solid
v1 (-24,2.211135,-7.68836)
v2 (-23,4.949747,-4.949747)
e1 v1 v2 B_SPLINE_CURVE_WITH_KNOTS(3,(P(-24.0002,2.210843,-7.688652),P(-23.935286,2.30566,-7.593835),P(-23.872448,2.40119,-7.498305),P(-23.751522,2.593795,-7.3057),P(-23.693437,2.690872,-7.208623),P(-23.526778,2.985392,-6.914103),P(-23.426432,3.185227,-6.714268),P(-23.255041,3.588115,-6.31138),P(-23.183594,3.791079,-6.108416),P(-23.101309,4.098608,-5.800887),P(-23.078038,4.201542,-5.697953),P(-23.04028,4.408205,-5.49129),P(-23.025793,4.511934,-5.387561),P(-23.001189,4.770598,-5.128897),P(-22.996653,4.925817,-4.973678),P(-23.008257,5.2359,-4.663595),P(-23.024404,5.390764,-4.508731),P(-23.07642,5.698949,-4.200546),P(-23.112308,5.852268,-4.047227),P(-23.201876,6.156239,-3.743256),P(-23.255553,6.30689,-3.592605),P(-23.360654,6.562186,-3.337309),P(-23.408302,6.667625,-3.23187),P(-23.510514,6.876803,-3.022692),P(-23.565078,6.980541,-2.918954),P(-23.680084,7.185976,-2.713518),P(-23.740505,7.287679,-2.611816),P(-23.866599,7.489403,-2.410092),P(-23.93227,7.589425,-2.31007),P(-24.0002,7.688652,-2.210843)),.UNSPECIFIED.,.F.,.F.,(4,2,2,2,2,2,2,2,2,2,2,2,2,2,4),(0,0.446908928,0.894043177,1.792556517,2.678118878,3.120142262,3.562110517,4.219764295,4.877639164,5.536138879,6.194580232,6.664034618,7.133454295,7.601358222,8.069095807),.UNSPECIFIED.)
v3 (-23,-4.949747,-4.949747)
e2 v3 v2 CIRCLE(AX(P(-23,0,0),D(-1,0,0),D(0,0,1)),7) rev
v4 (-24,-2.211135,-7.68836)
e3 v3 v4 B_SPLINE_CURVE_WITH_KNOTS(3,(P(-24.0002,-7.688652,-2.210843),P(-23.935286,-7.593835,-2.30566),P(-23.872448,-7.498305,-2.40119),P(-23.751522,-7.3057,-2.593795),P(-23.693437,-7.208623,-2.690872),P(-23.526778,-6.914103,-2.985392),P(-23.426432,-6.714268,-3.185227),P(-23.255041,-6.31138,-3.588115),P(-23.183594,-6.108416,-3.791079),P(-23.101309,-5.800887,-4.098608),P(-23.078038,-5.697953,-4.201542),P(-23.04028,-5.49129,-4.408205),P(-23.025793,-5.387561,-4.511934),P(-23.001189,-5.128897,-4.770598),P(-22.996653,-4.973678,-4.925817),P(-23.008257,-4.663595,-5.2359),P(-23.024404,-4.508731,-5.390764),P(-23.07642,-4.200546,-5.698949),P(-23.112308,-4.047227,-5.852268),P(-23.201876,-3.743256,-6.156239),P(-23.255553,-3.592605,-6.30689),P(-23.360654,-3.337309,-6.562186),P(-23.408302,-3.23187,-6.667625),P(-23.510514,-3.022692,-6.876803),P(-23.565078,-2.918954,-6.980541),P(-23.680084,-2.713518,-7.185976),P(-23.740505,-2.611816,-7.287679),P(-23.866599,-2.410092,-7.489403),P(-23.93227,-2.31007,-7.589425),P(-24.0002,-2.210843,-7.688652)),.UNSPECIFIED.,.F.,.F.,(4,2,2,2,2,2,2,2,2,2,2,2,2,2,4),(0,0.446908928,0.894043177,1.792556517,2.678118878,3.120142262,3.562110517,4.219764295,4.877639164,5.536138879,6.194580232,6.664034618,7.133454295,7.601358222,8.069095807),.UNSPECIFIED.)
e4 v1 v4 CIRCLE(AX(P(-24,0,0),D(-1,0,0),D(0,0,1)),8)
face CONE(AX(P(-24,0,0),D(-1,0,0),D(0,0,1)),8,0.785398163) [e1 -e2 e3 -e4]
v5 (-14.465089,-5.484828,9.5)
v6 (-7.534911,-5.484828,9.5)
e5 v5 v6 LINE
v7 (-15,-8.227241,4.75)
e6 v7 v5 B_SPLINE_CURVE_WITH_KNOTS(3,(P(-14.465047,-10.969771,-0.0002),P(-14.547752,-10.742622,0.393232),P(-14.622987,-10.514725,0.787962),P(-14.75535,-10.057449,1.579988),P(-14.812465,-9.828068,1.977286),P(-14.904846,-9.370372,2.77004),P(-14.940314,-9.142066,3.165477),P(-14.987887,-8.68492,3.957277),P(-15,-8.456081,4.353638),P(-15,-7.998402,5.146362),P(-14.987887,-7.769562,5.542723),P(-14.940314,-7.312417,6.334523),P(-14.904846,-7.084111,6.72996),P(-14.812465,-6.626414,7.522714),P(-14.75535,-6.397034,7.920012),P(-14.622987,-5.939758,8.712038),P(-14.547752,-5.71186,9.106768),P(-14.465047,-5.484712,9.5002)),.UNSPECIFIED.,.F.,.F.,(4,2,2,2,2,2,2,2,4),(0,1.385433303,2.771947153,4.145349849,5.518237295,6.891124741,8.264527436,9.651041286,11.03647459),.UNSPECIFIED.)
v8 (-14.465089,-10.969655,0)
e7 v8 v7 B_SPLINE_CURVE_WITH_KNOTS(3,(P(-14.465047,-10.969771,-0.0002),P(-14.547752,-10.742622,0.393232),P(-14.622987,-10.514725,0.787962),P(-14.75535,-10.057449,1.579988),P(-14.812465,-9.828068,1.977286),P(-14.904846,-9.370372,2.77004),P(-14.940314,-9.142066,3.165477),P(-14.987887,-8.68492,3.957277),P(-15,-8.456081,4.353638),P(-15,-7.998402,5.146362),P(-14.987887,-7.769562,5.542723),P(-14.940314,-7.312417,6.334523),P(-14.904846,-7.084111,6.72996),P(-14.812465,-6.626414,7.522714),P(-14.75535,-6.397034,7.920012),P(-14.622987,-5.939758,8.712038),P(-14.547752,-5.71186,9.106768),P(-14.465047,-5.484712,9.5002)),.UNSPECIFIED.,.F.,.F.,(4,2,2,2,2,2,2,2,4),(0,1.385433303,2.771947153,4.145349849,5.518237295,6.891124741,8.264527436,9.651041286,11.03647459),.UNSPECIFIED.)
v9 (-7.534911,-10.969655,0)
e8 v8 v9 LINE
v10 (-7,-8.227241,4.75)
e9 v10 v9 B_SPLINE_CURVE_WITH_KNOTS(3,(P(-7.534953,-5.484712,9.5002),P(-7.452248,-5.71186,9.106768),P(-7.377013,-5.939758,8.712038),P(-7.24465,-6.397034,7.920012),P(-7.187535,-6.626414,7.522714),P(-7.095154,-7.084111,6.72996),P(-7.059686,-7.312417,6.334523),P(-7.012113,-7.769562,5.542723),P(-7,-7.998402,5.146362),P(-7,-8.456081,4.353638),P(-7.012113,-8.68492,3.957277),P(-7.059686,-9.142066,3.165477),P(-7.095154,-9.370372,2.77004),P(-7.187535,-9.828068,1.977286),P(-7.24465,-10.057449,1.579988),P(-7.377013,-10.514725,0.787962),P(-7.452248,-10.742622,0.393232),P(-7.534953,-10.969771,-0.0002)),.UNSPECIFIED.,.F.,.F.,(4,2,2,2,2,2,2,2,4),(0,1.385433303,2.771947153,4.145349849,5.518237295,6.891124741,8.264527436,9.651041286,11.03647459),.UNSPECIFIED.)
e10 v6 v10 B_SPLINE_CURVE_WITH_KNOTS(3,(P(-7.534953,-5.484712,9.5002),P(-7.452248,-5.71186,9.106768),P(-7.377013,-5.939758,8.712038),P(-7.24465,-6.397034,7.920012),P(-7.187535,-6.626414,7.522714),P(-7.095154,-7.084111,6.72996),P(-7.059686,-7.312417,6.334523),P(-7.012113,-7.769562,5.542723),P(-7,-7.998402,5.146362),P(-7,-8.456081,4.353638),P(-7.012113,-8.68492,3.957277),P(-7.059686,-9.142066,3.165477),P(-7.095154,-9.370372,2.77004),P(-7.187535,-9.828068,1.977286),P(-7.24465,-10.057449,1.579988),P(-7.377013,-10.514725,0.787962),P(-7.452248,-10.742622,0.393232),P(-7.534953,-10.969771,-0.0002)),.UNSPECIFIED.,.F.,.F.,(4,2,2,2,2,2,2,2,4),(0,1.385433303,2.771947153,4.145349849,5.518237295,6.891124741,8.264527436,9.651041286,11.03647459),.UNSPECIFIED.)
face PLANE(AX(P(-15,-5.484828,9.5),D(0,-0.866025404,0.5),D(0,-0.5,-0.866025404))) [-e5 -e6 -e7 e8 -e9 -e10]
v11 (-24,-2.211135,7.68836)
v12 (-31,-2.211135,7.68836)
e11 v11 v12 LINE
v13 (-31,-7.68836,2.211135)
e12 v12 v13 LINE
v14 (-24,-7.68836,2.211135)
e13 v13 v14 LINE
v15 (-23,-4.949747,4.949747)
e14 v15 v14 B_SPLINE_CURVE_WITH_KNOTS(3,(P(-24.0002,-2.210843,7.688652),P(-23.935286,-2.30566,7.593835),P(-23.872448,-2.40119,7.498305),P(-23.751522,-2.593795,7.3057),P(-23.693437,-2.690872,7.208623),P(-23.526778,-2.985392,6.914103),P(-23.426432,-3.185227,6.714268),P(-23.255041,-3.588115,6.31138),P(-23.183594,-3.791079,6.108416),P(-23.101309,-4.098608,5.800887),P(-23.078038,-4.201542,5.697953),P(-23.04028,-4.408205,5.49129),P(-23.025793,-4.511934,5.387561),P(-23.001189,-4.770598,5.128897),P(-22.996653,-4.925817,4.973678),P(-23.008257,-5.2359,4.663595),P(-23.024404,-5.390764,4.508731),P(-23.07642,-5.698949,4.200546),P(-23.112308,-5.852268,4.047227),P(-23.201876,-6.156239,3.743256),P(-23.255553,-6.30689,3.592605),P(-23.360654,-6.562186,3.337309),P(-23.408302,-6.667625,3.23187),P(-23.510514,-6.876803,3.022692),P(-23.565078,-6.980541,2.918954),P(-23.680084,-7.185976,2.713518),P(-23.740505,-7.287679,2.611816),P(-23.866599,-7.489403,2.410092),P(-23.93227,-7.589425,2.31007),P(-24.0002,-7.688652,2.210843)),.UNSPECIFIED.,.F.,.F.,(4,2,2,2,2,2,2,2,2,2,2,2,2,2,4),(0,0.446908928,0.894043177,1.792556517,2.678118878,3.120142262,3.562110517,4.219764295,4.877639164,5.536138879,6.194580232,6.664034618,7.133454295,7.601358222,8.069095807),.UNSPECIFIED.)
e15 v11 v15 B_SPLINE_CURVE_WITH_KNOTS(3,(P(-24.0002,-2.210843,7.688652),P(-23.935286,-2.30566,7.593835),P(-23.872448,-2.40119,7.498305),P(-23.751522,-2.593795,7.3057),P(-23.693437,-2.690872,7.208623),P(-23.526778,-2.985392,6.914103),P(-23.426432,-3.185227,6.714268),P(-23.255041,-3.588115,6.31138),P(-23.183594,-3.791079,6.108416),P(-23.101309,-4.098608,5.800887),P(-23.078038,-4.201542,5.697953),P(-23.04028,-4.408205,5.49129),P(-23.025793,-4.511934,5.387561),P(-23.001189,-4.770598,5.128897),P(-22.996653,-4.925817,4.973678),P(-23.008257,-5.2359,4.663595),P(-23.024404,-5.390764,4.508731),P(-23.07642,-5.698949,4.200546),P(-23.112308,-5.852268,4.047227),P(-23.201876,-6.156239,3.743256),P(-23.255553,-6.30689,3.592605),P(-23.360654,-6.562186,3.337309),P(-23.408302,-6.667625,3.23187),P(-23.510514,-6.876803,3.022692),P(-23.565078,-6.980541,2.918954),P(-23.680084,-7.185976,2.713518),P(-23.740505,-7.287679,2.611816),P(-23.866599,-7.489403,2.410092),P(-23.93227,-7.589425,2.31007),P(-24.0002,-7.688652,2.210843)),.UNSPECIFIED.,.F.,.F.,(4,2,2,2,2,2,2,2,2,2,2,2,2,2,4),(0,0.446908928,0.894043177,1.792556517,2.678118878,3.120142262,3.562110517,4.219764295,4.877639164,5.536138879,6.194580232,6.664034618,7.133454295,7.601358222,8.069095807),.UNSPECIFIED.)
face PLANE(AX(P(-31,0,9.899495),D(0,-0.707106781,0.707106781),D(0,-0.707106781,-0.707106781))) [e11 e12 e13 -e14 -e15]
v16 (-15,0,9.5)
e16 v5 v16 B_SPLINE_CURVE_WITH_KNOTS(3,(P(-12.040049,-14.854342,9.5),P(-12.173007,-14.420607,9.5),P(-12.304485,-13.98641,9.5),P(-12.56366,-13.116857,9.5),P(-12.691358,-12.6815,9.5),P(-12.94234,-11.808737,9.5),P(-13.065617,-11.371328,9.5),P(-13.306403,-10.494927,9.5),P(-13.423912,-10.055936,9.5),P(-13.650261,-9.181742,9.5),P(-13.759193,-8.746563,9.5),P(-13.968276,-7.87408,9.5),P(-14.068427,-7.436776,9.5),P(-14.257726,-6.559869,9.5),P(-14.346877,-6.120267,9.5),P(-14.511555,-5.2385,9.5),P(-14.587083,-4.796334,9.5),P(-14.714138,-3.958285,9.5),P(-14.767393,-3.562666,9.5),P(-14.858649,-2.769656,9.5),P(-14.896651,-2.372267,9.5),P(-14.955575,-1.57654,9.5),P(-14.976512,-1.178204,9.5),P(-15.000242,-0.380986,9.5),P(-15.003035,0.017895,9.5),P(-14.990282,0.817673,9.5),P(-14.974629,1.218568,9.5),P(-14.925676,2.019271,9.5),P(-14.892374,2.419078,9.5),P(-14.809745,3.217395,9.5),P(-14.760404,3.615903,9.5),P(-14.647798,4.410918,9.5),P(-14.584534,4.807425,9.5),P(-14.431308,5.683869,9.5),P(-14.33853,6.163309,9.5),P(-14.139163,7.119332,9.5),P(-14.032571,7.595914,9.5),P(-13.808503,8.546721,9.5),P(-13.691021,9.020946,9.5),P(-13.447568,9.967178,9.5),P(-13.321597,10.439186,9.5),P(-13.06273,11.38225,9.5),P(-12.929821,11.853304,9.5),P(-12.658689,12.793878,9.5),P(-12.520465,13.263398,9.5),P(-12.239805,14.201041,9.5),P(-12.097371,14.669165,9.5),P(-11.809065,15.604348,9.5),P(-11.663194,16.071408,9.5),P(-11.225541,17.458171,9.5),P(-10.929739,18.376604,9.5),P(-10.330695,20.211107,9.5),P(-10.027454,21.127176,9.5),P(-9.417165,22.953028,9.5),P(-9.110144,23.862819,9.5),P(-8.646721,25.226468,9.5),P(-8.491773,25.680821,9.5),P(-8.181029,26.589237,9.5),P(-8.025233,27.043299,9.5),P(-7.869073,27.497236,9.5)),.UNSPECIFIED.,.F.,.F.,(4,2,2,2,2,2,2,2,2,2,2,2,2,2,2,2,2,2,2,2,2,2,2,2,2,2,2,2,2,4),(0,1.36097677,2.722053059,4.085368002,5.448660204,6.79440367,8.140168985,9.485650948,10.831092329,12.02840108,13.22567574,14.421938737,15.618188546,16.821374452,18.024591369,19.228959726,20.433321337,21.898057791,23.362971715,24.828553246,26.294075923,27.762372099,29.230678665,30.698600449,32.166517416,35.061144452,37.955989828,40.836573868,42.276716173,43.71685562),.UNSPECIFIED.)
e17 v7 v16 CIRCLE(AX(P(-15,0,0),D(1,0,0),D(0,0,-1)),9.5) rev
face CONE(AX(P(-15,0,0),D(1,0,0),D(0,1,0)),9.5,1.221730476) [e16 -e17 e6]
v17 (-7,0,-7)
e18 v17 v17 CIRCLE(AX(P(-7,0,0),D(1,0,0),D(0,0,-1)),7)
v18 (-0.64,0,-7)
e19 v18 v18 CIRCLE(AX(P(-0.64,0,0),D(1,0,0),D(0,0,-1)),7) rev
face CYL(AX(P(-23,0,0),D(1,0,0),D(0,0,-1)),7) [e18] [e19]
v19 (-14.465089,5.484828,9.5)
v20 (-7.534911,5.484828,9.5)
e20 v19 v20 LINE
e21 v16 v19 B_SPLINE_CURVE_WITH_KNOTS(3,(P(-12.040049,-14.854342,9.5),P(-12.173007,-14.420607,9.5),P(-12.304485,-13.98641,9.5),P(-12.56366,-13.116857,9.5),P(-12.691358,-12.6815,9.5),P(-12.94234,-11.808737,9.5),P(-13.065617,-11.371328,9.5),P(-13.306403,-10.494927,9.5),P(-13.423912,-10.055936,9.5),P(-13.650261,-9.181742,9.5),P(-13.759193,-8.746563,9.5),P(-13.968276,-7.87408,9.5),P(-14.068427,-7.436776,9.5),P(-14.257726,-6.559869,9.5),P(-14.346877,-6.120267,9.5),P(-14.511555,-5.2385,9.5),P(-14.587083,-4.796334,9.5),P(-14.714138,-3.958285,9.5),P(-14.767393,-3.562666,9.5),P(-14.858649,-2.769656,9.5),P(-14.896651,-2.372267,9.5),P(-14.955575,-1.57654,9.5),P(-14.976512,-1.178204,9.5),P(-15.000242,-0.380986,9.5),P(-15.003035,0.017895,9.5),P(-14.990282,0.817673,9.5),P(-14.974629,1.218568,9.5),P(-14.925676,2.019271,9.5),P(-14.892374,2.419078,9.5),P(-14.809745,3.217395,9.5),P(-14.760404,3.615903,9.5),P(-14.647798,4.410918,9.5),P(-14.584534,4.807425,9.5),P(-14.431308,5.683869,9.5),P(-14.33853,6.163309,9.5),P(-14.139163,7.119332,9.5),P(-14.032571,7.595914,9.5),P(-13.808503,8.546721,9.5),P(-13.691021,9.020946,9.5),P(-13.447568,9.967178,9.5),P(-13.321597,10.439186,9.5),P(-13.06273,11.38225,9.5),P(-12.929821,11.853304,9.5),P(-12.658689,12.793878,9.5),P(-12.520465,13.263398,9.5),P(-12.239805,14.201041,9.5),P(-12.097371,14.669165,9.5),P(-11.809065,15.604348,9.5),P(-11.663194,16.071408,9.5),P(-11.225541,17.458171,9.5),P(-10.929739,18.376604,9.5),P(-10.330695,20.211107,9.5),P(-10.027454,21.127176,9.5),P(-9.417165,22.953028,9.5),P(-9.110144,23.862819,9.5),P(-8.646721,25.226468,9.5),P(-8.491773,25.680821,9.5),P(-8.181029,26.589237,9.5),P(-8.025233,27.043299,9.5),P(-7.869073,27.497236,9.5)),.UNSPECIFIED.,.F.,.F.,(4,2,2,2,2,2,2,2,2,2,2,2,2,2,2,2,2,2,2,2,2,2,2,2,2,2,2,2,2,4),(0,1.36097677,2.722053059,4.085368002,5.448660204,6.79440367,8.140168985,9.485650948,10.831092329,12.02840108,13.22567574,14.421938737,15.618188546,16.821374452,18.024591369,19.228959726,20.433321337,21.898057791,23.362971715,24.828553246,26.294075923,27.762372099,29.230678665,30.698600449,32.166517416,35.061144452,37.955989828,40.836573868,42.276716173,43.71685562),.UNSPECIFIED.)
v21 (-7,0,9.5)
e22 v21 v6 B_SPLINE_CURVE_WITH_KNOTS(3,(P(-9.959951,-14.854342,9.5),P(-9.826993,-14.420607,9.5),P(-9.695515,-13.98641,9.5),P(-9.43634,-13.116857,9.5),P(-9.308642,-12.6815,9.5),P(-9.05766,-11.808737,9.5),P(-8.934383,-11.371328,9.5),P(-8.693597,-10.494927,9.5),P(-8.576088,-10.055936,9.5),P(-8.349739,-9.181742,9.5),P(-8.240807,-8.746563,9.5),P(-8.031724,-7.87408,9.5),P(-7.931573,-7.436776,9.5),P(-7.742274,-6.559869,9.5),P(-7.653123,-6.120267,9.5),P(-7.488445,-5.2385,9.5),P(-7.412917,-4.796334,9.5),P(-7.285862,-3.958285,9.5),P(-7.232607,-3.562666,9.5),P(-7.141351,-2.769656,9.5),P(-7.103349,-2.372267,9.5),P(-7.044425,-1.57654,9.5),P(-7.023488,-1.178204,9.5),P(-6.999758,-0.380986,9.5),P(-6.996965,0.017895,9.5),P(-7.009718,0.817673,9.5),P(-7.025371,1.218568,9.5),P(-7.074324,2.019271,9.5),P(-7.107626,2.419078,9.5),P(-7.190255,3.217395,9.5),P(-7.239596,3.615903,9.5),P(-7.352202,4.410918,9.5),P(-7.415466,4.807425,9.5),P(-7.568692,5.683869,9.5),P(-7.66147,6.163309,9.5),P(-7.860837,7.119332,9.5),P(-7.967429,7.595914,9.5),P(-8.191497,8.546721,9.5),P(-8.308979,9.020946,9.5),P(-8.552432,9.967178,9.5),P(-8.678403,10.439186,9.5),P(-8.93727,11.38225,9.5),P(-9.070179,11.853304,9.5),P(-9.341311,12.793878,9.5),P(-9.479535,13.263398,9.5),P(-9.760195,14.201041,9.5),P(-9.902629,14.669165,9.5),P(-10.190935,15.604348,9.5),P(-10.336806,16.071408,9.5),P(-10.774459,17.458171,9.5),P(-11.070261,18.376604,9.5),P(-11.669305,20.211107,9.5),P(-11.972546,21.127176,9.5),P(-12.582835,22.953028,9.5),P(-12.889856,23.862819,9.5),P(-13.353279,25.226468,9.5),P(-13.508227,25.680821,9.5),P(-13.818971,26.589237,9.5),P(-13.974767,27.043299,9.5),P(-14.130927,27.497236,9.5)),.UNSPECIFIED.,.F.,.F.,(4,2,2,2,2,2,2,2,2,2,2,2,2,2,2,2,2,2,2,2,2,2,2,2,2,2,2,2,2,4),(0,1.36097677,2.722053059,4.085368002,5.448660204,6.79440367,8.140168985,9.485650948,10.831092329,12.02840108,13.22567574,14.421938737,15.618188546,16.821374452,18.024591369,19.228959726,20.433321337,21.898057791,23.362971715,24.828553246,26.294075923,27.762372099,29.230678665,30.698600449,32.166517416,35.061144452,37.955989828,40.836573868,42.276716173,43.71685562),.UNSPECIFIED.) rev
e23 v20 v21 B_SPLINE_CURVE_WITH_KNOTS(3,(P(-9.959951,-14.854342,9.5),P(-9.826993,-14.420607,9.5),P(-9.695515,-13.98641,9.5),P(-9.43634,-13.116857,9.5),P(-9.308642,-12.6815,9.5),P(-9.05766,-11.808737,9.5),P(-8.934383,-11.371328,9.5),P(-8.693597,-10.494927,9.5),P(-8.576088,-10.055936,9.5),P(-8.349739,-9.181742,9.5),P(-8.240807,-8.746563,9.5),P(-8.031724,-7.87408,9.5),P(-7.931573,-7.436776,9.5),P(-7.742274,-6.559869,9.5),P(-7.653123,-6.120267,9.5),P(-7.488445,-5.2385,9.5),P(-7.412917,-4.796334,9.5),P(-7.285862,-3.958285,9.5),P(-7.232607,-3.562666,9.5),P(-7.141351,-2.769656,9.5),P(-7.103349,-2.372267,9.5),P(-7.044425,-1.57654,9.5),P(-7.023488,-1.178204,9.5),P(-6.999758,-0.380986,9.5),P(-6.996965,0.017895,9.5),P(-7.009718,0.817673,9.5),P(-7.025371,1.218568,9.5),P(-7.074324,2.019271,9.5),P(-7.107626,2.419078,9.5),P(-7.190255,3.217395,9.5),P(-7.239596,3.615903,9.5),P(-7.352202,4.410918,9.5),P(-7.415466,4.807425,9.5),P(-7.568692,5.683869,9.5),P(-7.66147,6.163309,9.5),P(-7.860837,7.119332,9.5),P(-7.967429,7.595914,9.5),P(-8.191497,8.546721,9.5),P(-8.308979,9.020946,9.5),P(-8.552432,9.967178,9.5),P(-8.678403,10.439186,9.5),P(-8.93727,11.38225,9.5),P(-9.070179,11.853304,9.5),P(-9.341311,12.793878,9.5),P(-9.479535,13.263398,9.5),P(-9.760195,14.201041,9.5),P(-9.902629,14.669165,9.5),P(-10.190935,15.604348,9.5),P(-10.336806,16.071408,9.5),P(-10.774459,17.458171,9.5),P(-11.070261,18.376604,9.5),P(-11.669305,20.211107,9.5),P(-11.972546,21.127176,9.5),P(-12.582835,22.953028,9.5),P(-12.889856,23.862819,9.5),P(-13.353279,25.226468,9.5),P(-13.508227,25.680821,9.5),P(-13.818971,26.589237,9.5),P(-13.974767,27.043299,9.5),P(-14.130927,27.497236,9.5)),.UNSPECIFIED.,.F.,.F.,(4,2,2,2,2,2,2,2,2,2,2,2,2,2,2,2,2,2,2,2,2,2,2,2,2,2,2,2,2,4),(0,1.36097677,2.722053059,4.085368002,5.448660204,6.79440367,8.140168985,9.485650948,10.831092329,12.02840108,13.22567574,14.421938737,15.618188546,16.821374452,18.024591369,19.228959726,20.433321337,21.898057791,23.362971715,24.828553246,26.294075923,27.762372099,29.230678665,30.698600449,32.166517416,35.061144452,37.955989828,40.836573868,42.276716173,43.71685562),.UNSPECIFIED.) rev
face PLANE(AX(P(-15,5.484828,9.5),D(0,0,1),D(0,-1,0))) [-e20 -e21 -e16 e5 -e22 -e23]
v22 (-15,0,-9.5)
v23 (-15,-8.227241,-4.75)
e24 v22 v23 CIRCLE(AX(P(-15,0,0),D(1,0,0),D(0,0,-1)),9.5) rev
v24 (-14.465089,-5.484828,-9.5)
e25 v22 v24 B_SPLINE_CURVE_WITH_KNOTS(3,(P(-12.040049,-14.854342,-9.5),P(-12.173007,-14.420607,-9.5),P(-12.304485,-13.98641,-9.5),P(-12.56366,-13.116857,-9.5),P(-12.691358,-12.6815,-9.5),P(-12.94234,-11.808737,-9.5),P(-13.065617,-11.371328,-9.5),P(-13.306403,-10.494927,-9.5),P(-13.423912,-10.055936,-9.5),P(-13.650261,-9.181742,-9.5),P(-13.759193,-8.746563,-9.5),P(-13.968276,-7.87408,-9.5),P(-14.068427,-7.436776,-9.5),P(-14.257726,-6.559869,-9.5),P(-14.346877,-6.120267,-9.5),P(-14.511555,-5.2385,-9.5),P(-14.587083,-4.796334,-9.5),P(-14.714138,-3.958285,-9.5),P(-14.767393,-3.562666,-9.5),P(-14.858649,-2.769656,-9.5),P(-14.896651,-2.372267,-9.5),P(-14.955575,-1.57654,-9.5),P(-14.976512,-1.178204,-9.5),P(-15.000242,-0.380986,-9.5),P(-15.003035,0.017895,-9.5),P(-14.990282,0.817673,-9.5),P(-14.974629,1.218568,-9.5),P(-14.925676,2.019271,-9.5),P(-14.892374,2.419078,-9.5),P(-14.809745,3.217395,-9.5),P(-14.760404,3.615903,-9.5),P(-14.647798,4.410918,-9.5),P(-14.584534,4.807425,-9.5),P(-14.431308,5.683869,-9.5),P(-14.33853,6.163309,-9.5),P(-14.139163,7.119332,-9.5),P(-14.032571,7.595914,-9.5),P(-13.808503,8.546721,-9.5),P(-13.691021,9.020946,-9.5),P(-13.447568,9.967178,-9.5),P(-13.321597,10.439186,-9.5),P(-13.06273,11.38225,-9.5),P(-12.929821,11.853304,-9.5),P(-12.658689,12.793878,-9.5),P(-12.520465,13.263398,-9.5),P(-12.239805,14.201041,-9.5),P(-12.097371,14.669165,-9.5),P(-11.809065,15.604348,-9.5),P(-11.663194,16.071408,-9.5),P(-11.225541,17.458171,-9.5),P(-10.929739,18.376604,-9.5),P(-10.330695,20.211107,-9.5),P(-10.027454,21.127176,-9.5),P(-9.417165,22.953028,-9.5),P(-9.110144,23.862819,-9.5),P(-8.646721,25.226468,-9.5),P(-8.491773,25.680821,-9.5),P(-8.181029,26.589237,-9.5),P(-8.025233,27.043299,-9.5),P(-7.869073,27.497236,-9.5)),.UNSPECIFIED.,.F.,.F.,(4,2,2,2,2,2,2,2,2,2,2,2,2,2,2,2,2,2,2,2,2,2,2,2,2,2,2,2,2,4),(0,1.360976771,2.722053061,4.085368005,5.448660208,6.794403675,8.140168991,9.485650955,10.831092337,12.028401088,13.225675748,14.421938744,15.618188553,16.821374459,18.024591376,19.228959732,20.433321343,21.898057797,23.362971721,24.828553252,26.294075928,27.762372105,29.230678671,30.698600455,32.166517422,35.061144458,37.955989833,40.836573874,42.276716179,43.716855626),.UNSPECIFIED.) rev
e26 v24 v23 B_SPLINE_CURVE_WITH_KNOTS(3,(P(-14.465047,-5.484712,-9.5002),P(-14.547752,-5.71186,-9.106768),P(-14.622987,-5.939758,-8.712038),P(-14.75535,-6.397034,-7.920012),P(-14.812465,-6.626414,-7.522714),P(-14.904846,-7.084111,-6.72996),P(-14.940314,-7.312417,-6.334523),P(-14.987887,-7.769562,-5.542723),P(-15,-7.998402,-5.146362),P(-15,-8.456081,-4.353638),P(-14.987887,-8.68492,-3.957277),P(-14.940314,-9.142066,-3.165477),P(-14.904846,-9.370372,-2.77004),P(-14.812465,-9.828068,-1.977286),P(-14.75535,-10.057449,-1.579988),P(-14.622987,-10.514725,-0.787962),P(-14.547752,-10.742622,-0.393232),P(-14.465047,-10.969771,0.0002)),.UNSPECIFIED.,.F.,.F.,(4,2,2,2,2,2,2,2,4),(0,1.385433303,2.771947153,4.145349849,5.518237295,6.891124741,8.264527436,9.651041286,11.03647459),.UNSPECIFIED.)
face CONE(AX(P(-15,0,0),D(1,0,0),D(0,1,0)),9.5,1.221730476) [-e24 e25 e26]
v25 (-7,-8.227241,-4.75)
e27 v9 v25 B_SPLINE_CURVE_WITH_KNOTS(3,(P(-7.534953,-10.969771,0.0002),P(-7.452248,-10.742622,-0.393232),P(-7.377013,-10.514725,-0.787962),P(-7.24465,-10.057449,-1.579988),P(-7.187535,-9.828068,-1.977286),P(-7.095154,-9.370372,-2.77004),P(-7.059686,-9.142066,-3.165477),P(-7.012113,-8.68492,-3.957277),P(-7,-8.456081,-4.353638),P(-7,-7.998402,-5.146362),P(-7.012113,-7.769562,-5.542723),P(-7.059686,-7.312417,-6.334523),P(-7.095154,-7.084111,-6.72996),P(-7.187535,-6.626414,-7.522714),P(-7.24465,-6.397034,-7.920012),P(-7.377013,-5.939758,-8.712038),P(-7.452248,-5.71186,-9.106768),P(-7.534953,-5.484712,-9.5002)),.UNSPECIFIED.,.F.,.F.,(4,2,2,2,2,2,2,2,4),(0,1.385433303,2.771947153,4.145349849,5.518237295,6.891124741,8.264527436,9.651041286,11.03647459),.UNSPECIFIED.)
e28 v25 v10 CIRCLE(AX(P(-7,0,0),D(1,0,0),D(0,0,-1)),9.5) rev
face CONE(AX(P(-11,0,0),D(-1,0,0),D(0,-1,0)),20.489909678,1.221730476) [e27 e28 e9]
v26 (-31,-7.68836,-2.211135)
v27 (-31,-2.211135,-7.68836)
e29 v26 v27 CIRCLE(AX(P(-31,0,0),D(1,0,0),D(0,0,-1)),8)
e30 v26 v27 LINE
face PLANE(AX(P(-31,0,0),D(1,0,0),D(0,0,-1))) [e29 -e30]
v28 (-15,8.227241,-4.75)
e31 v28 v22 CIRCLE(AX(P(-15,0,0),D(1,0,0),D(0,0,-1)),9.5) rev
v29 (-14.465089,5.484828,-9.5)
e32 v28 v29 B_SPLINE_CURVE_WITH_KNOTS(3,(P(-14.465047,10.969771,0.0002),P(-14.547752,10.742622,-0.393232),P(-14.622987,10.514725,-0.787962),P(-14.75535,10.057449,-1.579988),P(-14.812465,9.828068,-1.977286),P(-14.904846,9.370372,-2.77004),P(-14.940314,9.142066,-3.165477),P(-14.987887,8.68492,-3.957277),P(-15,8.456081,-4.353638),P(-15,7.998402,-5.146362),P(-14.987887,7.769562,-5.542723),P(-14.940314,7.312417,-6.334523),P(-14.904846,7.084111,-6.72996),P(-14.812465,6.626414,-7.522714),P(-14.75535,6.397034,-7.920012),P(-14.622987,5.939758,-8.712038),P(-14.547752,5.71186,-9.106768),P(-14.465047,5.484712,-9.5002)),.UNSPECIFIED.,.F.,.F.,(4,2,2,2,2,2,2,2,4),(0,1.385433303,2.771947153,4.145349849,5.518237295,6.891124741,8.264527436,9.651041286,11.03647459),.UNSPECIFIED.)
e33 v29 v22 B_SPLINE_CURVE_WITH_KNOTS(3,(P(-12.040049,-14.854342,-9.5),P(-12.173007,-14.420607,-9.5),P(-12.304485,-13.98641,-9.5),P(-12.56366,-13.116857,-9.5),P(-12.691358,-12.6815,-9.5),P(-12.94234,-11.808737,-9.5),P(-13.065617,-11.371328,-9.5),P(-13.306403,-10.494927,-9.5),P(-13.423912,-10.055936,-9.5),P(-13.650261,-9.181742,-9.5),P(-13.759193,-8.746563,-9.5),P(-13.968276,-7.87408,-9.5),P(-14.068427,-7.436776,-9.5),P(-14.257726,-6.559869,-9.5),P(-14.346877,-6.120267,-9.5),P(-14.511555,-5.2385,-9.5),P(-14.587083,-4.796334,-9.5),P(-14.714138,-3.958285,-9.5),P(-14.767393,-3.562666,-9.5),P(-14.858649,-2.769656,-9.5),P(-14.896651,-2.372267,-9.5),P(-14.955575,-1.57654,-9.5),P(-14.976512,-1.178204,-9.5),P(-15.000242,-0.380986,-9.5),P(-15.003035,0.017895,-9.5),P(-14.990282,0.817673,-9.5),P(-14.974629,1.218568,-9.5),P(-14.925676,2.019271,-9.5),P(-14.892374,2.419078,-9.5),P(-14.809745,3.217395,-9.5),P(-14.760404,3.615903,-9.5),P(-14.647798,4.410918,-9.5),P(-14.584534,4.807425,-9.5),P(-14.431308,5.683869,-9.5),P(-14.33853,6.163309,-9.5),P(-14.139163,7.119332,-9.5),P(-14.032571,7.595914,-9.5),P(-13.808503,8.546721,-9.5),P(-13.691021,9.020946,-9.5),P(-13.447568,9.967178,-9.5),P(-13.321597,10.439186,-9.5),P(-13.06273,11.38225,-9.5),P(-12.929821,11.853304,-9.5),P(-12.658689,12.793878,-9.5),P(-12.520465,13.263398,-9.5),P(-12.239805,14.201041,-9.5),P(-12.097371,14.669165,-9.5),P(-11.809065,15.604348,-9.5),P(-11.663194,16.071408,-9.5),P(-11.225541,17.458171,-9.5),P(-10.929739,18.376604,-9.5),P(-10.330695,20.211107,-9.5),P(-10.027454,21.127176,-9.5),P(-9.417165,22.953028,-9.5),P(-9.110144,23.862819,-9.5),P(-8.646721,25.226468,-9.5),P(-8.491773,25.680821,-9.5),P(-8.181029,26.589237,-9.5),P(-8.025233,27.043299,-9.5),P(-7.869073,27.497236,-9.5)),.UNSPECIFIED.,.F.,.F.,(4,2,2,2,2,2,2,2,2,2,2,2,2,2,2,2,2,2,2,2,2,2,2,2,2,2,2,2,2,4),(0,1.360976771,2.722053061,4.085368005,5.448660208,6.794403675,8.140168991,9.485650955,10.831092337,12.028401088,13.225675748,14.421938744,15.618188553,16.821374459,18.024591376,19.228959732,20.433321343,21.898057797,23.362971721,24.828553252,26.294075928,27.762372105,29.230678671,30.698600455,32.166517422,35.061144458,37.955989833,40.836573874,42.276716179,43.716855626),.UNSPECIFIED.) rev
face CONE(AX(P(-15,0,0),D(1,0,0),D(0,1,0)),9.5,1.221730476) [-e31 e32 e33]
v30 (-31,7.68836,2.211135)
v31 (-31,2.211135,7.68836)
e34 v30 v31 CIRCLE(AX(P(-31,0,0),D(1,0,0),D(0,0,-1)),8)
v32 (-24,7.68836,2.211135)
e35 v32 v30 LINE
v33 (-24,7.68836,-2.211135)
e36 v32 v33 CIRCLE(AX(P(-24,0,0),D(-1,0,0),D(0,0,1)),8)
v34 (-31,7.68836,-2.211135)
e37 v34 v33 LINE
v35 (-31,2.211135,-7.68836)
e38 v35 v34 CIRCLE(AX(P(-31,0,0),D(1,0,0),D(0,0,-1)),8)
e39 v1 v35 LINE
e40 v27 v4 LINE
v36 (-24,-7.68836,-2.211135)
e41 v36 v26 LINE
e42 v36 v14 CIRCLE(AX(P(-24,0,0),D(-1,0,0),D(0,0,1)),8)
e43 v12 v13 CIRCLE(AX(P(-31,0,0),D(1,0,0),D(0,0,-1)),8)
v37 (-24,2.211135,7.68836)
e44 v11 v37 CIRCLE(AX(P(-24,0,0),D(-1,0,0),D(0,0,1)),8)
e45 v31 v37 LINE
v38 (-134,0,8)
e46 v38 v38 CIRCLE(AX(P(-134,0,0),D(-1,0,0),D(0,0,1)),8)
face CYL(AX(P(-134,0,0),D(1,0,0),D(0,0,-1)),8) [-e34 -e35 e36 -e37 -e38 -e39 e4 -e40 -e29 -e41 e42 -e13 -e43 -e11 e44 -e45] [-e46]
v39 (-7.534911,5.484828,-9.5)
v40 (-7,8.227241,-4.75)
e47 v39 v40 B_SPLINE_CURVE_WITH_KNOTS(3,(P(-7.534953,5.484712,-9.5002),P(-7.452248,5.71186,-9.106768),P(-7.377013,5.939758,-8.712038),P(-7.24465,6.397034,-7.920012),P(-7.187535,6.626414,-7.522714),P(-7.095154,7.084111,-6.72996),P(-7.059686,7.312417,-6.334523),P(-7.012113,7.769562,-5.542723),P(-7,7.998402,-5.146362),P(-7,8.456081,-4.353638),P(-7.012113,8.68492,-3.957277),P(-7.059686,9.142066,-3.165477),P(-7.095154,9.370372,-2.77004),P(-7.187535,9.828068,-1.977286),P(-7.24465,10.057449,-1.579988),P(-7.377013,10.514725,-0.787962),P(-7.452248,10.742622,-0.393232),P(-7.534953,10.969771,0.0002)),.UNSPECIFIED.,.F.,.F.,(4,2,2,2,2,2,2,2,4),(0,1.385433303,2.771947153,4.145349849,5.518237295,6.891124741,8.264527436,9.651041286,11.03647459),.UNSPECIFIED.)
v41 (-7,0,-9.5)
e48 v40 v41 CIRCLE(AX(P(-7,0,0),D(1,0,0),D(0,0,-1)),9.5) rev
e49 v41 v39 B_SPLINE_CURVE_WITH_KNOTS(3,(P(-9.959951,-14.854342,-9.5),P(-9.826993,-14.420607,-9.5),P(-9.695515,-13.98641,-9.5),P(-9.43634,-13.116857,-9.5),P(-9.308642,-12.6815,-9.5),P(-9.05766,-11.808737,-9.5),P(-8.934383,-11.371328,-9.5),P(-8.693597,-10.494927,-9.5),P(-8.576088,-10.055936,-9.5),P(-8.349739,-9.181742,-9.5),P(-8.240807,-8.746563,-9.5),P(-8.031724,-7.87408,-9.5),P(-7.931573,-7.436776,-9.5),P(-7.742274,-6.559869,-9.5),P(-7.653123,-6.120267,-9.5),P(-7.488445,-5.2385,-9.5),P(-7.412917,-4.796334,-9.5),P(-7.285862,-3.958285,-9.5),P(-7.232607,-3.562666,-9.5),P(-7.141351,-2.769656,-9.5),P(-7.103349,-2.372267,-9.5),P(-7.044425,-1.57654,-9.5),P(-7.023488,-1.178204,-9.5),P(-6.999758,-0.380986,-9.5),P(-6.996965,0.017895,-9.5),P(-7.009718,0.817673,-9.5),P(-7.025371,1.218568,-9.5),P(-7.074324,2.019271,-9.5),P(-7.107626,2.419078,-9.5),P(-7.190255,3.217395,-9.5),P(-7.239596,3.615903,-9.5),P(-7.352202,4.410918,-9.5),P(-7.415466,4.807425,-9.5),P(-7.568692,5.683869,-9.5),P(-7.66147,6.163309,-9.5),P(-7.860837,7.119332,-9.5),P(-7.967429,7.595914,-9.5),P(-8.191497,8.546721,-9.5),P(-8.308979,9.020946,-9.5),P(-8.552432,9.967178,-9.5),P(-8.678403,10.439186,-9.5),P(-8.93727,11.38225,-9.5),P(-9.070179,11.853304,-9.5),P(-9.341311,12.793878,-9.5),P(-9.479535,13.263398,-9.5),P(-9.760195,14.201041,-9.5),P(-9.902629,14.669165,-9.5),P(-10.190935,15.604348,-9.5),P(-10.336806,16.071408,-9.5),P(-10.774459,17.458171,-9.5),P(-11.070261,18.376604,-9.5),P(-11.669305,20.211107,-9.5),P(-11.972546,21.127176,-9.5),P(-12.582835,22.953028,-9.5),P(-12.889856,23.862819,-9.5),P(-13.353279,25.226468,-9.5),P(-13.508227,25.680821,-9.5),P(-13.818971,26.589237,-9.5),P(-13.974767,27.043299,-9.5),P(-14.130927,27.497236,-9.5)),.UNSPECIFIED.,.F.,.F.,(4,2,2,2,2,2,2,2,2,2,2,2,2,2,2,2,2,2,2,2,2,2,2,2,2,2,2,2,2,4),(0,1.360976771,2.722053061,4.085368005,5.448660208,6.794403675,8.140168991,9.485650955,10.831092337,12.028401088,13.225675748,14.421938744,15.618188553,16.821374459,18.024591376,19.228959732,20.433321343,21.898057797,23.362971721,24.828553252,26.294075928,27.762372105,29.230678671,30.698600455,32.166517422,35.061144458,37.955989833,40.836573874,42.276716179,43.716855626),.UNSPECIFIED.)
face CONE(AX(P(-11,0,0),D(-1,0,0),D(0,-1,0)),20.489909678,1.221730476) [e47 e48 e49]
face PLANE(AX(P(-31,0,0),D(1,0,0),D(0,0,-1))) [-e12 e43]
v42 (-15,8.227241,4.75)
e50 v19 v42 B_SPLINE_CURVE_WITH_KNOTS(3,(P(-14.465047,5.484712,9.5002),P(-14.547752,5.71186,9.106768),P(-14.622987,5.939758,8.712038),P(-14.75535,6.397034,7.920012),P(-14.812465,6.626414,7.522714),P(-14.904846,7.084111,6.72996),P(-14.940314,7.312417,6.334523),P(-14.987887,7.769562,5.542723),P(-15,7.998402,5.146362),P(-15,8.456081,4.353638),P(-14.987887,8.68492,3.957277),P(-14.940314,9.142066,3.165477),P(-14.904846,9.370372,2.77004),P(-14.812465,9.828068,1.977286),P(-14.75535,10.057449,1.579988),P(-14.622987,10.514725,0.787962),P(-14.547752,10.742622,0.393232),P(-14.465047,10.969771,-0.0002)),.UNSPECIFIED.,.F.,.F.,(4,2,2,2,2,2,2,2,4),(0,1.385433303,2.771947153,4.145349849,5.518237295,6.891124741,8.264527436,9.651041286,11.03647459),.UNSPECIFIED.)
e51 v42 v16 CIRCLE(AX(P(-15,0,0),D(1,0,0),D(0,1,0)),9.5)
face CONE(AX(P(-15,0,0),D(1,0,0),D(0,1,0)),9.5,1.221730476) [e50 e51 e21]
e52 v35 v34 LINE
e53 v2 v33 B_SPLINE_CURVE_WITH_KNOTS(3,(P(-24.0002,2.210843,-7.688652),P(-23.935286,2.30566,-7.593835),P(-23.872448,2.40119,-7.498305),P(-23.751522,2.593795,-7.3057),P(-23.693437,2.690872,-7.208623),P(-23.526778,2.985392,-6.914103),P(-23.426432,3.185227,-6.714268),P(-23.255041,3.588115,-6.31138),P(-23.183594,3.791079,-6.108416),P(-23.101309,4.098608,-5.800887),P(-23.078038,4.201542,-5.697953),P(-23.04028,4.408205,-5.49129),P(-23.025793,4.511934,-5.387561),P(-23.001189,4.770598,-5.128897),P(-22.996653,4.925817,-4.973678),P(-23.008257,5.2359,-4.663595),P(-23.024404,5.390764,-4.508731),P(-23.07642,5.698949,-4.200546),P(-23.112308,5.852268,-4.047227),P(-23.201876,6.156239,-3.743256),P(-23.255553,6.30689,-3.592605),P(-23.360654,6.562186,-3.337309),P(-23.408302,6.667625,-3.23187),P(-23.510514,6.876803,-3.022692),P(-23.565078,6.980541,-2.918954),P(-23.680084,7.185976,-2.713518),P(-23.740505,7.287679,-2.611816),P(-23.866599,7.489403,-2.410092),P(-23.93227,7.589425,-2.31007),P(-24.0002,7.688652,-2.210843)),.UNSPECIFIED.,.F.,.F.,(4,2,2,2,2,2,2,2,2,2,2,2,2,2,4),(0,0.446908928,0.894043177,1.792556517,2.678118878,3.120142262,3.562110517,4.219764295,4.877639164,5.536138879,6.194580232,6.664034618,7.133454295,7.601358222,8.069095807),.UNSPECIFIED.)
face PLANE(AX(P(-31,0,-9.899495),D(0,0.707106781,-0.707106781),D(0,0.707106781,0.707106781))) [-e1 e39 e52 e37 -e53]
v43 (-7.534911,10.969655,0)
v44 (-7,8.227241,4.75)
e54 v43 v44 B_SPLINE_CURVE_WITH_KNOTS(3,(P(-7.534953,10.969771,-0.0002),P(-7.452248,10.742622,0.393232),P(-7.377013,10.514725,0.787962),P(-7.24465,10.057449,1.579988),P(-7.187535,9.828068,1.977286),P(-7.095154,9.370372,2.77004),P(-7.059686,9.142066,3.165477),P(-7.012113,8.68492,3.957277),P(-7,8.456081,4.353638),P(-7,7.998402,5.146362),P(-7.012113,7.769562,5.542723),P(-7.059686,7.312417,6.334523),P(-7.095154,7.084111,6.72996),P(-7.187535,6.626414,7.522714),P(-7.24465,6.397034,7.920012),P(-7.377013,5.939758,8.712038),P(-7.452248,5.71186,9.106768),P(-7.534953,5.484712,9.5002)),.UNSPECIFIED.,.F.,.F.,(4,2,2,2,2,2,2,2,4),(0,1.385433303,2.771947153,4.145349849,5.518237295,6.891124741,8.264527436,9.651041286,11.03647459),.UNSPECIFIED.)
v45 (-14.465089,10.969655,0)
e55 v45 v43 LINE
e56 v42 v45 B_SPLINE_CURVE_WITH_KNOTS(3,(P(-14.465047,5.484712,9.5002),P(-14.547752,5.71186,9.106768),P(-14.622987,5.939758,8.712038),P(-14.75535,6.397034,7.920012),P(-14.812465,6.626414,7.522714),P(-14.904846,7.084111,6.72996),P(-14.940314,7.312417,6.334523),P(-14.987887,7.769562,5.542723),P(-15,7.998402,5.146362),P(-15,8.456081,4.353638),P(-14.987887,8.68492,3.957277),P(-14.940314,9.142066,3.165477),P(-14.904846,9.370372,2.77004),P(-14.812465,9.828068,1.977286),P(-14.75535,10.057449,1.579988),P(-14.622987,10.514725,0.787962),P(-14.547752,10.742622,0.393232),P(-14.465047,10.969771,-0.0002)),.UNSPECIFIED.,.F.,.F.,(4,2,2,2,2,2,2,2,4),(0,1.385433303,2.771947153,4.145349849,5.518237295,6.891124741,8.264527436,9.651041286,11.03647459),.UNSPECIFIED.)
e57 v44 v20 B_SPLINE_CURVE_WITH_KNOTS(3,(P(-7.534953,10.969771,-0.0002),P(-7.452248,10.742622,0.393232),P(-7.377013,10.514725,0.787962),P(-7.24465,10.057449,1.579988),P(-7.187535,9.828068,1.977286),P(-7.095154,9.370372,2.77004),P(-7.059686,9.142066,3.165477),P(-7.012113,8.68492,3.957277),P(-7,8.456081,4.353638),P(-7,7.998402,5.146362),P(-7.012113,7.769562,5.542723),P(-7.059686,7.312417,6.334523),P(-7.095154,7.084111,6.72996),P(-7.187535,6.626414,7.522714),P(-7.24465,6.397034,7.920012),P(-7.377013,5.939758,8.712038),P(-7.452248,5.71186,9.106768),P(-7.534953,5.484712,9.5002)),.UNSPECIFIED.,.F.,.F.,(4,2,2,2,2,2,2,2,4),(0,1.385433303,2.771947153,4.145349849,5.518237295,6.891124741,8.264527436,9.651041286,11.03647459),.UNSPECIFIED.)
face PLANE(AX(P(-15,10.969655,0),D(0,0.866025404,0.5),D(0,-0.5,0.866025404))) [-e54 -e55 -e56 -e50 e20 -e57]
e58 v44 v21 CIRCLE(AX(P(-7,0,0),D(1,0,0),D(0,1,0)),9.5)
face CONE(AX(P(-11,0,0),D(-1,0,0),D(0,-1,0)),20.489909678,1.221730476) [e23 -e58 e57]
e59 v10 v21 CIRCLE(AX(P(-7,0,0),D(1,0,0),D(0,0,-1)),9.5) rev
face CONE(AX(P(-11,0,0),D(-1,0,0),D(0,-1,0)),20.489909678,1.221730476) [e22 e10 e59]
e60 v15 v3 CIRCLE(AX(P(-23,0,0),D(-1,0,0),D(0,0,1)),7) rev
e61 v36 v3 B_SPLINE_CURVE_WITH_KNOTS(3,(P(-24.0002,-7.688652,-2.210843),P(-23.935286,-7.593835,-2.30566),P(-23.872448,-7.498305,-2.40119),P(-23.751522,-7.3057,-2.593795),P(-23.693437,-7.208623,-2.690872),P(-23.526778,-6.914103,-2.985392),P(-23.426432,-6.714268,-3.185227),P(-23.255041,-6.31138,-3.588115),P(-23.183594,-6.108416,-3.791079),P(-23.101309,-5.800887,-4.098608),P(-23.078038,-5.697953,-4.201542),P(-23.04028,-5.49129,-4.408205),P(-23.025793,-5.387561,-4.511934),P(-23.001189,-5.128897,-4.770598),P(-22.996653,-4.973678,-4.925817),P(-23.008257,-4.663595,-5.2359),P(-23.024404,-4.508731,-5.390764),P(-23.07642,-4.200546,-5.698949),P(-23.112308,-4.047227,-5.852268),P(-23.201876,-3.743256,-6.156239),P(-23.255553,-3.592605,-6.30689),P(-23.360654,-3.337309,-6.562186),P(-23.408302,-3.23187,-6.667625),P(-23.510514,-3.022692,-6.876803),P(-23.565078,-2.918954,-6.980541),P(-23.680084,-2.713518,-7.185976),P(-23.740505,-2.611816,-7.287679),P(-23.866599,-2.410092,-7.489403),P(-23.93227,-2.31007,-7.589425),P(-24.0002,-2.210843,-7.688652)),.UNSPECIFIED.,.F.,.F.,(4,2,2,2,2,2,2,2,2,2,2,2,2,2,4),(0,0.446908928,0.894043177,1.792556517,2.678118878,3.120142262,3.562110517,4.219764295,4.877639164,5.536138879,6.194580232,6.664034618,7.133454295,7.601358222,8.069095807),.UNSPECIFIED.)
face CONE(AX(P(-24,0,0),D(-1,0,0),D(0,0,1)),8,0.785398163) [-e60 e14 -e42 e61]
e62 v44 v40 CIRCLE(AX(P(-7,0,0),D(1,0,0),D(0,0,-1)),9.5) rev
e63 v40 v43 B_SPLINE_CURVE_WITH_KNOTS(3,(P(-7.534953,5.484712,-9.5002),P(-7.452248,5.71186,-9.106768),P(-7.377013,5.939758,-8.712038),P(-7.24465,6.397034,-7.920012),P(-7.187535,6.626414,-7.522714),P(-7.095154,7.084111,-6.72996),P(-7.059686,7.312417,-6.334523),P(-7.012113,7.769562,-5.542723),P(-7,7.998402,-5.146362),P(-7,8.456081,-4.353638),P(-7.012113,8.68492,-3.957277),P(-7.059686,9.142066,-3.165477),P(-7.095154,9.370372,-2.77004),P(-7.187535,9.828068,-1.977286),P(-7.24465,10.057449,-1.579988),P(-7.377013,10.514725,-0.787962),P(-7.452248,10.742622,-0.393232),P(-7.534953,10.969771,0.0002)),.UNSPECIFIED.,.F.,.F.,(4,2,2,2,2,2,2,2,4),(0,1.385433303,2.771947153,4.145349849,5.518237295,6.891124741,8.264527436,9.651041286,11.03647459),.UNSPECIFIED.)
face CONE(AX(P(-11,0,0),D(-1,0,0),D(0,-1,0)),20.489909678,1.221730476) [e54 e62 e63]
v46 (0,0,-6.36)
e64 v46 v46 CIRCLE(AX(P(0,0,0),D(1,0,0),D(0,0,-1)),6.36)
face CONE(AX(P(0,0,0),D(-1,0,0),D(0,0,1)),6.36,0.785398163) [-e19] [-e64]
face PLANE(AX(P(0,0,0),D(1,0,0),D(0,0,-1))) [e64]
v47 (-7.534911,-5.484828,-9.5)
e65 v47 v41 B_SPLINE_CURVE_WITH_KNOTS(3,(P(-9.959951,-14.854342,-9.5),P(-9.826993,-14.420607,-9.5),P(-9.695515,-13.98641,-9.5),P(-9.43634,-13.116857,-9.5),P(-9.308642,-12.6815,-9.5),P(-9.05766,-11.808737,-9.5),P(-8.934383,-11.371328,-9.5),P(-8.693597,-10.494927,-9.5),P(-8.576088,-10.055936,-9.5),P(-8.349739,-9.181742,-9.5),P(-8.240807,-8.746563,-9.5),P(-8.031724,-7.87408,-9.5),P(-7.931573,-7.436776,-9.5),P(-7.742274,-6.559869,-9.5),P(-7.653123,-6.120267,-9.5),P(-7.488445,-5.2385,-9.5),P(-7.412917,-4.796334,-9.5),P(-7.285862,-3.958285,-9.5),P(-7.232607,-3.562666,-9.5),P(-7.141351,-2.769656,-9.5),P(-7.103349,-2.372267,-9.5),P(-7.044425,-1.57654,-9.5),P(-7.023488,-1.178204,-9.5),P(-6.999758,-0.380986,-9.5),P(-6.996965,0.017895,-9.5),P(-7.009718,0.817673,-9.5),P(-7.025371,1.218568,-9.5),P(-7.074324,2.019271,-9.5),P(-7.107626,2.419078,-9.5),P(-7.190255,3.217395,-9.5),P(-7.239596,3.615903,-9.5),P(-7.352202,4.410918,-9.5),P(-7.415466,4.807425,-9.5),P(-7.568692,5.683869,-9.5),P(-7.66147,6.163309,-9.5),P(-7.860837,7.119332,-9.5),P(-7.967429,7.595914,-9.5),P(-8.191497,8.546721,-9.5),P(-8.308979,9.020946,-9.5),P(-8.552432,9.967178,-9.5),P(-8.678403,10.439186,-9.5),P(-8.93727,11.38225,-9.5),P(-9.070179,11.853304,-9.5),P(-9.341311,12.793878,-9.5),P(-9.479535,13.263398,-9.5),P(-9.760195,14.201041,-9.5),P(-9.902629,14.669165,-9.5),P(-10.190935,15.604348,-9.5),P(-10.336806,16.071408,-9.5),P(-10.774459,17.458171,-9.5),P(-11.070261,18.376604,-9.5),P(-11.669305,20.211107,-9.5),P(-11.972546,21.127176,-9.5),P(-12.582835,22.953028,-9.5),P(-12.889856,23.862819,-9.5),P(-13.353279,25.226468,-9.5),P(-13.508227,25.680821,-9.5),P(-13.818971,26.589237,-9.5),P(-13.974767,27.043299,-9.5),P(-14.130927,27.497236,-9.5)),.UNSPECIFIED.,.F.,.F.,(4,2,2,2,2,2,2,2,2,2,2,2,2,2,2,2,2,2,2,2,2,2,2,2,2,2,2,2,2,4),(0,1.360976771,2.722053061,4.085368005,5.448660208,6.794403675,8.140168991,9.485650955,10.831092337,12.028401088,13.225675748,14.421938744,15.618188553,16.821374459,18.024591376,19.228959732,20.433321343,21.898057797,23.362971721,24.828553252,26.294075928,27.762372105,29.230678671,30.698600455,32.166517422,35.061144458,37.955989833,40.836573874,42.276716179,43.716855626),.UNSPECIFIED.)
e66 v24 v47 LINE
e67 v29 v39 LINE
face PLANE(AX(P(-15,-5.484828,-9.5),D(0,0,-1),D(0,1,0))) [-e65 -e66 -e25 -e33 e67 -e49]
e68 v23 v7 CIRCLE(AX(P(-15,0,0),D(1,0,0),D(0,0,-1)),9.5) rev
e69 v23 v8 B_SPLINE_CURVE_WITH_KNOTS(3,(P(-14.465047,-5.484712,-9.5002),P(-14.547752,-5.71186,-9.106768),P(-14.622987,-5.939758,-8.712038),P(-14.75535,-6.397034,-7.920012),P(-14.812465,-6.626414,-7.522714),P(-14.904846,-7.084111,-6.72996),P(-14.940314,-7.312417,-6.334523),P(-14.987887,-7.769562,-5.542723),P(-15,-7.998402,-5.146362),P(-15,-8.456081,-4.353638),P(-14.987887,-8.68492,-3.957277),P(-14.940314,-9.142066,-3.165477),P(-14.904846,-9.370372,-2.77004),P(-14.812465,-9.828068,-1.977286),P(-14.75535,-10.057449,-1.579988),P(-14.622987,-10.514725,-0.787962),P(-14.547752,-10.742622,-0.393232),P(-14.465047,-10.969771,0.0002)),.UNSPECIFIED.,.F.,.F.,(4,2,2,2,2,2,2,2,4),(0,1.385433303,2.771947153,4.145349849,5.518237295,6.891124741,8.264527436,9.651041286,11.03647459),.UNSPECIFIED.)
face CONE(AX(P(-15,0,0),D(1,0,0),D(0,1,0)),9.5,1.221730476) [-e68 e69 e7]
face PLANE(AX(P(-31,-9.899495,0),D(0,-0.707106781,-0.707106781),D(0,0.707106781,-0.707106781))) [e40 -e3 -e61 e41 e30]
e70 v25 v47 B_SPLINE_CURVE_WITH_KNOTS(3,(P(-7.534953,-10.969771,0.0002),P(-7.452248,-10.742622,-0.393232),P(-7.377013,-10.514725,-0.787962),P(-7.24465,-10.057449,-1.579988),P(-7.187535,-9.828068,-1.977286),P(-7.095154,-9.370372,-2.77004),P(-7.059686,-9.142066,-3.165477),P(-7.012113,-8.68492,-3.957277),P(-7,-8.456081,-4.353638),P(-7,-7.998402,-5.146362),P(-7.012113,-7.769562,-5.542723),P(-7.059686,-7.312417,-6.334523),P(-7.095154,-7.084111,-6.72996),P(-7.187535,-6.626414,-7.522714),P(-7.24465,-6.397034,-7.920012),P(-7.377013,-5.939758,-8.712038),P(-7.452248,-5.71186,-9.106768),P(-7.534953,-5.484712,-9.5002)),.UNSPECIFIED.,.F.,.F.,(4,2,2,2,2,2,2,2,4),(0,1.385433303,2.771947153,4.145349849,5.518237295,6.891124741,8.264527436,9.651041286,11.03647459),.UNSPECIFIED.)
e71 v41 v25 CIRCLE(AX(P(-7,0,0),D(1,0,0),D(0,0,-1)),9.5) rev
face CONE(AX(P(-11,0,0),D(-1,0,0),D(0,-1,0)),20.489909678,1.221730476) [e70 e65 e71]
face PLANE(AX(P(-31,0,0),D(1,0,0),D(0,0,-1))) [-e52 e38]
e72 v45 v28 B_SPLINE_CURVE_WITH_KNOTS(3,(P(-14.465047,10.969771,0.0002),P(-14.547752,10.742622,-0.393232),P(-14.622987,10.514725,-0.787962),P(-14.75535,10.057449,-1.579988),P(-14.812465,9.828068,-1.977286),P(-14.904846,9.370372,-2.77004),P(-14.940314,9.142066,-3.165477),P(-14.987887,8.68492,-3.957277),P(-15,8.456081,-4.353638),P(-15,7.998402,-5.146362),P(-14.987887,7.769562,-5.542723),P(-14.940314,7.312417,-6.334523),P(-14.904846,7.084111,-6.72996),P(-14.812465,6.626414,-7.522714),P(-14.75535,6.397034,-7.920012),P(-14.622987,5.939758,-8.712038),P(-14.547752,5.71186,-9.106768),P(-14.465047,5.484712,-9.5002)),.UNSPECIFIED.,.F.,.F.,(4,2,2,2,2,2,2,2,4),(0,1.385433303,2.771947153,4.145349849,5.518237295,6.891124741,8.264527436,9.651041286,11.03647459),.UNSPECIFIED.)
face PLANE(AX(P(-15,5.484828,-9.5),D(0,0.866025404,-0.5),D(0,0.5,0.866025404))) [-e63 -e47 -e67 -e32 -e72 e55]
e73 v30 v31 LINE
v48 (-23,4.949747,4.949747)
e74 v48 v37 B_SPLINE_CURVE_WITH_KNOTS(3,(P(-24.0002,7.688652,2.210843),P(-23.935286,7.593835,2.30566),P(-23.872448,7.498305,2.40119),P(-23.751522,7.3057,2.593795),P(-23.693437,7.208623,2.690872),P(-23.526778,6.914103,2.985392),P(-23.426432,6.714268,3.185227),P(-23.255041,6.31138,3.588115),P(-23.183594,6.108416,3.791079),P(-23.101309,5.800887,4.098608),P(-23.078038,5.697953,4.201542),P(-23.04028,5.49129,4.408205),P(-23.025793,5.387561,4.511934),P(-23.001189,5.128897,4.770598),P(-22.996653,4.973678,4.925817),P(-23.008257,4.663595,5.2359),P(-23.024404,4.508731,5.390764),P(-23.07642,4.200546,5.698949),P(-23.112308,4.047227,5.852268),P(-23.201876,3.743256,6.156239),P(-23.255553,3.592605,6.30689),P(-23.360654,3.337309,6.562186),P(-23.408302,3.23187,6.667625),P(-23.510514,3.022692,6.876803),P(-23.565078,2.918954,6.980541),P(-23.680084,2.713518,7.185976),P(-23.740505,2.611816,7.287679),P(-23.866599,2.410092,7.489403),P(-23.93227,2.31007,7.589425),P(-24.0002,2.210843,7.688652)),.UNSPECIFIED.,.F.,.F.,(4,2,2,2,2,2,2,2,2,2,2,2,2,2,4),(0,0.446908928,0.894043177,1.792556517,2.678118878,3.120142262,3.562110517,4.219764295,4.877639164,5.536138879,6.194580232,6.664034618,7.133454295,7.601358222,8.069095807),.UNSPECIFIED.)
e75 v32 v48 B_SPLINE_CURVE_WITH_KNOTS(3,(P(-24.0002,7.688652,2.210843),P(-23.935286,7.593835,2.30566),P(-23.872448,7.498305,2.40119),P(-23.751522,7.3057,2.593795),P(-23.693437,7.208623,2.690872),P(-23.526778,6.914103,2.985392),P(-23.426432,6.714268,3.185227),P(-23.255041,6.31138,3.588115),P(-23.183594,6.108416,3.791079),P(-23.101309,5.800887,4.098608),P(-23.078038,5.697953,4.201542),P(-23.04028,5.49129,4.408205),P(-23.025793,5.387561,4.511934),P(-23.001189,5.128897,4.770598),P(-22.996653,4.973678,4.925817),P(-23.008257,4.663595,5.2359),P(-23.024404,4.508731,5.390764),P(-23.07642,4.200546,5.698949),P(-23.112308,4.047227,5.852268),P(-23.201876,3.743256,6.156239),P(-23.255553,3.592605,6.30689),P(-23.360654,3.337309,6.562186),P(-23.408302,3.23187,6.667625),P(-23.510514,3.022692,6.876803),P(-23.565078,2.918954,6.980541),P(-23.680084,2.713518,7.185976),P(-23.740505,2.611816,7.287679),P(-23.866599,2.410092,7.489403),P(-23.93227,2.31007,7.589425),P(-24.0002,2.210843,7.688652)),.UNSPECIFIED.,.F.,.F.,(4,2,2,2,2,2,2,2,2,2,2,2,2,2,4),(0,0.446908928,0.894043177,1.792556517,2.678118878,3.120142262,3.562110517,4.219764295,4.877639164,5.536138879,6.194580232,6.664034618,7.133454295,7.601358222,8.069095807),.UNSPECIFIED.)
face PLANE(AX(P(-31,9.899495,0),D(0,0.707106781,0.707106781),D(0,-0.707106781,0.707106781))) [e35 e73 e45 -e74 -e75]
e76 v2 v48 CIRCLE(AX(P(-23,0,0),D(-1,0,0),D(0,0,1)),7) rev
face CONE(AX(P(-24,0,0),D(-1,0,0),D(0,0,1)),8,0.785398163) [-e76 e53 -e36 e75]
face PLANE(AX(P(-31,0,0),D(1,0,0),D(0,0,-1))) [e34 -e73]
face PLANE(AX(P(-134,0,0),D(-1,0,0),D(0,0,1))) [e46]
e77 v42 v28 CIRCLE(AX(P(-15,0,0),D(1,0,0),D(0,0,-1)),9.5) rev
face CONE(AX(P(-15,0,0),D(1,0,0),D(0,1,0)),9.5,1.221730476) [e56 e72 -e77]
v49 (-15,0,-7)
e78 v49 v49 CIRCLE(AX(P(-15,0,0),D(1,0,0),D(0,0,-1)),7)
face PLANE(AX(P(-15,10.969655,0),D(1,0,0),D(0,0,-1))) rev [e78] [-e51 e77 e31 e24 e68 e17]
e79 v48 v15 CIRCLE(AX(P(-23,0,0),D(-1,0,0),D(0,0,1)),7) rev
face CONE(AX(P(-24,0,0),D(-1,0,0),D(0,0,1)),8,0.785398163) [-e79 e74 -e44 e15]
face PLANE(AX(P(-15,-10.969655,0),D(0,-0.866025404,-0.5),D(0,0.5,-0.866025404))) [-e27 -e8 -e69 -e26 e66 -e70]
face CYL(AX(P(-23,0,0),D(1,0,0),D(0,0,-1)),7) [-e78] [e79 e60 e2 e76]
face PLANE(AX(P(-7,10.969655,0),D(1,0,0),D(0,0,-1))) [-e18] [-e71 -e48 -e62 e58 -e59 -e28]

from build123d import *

# Parameters (mm, degrees)
EXTRUDE_START       = -7
EXTRUDE_1_DEPTH     = 8
EXTRUDE_START_2     = 7
SKETCH_3_R          = 7
EXTRUDE_2_DEPTH     = 23
SKETCH_4_R          = 8
EXTRUDE_3_DEPTH     = 111
CHAMFER_1_SIZE      = 1
CHAMFER_2_SIZE      = 0.64
CUT_EXTRUDE_START   = -23
SKETCH_6_OUTSIDE_W  = 48.422
SKETCH_6_OUTSIDE_H  = 51.362
CUT_EXTRUDE_2_DEPTH = 8


with BuildPart() as part:
    # 草图2 → 凸台-拉伸1 (new body)
    with BuildSketch(Plane(origin=(0, 0, 0), x_dir=(0, 0, -1), z_dir=(1, 0, 0)).offset(EXTRUDE_START)):
        Polygon((0, 10.969655115), (-9.5, 5.484827557), (-9.5, -5.484827557), (0, -10.969655115), (9.5, -5.484827557), (9.5, 5.484827557), align=None)
    extrude(amount=-EXTRUDE_1_DEPTH)

    # 草图3 → 凸台-拉伸2 (add)
    with BuildSketch(Plane(origin=(-7, 0, 0), x_dir=(0, 0, -1), z_dir=(1, 0, 0)).offset(EXTRUDE_START_2)):
        Circle(SKETCH_3_R)
    extrude(amount=-EXTRUDE_2_DEPTH)

    # 草图4 → 凸台-拉伸3 (add)
    with BuildSketch(Plane.ZY.offset(23)):
        Circle(SKETCH_4_R)
    extrude(amount=EXTRUDE_3_DEPTH)

    # 倒角1
    chamfer_1_edges = [part.edges().sort_by_distance(p)[0] for p in [
        (-23, 0, -8),
    ]]
    chamfer(chamfer_1_edges, length=CHAMFER_1_SIZE - 0.0001)  # a hair under: the kernel refuses the full size

    # 倒角2
    chamfer_2_edges = [part.edges().sort_by_distance(p)[0] for p in [
        (0, 0, 7),
    ]]
    chamfer(chamfer_2_edges, length=CHAMFER_2_SIZE)

    # 草图5 → 切除-旋转1 (revolve, cut)
    with BuildSketch(Plane(origin=(0, 0, 0), x_dir=(1, 0, 0), z_dir=(0, 1, 0)), mode=Mode.PRIVATE) as cut_revolve_1_sk:
        Polygon((-7, 9.5), (-7, 30.489909678), (-15, 30.489909678), (-15, 9.5), (-11, 20.489909678), align=None)
    revolve(cut_revolve_1_sk.sketch.rotate(Axis((0, 0, 0), (-1, 0, 0)), 180), axis=Axis((0, 0, 0), (-1, 0, 0)), mode=Mode.SUBTRACT)

    # 草图6 outside → 切除-拉伸2 (cut)
    with BuildSketch(Plane(origin=(0, 0, 0), x_dir=(0, 0, -1), z_dir=(1, 0, 0)).offset(CUT_EXTRUDE_START)):
        Rectangle(SKETCH_6_OUTSIDE_W, SKETCH_6_OUTSIDE_H)
        Polygon((0, 9.899494937), (-9.899494937, 0), (0, -9.899494937), (9.899494937, 0), align=None, mode=Mode.SUBTRACT)
    extrude(amount=-CUT_EXTRUDE_2_DEPTH, mode=Mode.SUBTRACT)


solid = part.part
